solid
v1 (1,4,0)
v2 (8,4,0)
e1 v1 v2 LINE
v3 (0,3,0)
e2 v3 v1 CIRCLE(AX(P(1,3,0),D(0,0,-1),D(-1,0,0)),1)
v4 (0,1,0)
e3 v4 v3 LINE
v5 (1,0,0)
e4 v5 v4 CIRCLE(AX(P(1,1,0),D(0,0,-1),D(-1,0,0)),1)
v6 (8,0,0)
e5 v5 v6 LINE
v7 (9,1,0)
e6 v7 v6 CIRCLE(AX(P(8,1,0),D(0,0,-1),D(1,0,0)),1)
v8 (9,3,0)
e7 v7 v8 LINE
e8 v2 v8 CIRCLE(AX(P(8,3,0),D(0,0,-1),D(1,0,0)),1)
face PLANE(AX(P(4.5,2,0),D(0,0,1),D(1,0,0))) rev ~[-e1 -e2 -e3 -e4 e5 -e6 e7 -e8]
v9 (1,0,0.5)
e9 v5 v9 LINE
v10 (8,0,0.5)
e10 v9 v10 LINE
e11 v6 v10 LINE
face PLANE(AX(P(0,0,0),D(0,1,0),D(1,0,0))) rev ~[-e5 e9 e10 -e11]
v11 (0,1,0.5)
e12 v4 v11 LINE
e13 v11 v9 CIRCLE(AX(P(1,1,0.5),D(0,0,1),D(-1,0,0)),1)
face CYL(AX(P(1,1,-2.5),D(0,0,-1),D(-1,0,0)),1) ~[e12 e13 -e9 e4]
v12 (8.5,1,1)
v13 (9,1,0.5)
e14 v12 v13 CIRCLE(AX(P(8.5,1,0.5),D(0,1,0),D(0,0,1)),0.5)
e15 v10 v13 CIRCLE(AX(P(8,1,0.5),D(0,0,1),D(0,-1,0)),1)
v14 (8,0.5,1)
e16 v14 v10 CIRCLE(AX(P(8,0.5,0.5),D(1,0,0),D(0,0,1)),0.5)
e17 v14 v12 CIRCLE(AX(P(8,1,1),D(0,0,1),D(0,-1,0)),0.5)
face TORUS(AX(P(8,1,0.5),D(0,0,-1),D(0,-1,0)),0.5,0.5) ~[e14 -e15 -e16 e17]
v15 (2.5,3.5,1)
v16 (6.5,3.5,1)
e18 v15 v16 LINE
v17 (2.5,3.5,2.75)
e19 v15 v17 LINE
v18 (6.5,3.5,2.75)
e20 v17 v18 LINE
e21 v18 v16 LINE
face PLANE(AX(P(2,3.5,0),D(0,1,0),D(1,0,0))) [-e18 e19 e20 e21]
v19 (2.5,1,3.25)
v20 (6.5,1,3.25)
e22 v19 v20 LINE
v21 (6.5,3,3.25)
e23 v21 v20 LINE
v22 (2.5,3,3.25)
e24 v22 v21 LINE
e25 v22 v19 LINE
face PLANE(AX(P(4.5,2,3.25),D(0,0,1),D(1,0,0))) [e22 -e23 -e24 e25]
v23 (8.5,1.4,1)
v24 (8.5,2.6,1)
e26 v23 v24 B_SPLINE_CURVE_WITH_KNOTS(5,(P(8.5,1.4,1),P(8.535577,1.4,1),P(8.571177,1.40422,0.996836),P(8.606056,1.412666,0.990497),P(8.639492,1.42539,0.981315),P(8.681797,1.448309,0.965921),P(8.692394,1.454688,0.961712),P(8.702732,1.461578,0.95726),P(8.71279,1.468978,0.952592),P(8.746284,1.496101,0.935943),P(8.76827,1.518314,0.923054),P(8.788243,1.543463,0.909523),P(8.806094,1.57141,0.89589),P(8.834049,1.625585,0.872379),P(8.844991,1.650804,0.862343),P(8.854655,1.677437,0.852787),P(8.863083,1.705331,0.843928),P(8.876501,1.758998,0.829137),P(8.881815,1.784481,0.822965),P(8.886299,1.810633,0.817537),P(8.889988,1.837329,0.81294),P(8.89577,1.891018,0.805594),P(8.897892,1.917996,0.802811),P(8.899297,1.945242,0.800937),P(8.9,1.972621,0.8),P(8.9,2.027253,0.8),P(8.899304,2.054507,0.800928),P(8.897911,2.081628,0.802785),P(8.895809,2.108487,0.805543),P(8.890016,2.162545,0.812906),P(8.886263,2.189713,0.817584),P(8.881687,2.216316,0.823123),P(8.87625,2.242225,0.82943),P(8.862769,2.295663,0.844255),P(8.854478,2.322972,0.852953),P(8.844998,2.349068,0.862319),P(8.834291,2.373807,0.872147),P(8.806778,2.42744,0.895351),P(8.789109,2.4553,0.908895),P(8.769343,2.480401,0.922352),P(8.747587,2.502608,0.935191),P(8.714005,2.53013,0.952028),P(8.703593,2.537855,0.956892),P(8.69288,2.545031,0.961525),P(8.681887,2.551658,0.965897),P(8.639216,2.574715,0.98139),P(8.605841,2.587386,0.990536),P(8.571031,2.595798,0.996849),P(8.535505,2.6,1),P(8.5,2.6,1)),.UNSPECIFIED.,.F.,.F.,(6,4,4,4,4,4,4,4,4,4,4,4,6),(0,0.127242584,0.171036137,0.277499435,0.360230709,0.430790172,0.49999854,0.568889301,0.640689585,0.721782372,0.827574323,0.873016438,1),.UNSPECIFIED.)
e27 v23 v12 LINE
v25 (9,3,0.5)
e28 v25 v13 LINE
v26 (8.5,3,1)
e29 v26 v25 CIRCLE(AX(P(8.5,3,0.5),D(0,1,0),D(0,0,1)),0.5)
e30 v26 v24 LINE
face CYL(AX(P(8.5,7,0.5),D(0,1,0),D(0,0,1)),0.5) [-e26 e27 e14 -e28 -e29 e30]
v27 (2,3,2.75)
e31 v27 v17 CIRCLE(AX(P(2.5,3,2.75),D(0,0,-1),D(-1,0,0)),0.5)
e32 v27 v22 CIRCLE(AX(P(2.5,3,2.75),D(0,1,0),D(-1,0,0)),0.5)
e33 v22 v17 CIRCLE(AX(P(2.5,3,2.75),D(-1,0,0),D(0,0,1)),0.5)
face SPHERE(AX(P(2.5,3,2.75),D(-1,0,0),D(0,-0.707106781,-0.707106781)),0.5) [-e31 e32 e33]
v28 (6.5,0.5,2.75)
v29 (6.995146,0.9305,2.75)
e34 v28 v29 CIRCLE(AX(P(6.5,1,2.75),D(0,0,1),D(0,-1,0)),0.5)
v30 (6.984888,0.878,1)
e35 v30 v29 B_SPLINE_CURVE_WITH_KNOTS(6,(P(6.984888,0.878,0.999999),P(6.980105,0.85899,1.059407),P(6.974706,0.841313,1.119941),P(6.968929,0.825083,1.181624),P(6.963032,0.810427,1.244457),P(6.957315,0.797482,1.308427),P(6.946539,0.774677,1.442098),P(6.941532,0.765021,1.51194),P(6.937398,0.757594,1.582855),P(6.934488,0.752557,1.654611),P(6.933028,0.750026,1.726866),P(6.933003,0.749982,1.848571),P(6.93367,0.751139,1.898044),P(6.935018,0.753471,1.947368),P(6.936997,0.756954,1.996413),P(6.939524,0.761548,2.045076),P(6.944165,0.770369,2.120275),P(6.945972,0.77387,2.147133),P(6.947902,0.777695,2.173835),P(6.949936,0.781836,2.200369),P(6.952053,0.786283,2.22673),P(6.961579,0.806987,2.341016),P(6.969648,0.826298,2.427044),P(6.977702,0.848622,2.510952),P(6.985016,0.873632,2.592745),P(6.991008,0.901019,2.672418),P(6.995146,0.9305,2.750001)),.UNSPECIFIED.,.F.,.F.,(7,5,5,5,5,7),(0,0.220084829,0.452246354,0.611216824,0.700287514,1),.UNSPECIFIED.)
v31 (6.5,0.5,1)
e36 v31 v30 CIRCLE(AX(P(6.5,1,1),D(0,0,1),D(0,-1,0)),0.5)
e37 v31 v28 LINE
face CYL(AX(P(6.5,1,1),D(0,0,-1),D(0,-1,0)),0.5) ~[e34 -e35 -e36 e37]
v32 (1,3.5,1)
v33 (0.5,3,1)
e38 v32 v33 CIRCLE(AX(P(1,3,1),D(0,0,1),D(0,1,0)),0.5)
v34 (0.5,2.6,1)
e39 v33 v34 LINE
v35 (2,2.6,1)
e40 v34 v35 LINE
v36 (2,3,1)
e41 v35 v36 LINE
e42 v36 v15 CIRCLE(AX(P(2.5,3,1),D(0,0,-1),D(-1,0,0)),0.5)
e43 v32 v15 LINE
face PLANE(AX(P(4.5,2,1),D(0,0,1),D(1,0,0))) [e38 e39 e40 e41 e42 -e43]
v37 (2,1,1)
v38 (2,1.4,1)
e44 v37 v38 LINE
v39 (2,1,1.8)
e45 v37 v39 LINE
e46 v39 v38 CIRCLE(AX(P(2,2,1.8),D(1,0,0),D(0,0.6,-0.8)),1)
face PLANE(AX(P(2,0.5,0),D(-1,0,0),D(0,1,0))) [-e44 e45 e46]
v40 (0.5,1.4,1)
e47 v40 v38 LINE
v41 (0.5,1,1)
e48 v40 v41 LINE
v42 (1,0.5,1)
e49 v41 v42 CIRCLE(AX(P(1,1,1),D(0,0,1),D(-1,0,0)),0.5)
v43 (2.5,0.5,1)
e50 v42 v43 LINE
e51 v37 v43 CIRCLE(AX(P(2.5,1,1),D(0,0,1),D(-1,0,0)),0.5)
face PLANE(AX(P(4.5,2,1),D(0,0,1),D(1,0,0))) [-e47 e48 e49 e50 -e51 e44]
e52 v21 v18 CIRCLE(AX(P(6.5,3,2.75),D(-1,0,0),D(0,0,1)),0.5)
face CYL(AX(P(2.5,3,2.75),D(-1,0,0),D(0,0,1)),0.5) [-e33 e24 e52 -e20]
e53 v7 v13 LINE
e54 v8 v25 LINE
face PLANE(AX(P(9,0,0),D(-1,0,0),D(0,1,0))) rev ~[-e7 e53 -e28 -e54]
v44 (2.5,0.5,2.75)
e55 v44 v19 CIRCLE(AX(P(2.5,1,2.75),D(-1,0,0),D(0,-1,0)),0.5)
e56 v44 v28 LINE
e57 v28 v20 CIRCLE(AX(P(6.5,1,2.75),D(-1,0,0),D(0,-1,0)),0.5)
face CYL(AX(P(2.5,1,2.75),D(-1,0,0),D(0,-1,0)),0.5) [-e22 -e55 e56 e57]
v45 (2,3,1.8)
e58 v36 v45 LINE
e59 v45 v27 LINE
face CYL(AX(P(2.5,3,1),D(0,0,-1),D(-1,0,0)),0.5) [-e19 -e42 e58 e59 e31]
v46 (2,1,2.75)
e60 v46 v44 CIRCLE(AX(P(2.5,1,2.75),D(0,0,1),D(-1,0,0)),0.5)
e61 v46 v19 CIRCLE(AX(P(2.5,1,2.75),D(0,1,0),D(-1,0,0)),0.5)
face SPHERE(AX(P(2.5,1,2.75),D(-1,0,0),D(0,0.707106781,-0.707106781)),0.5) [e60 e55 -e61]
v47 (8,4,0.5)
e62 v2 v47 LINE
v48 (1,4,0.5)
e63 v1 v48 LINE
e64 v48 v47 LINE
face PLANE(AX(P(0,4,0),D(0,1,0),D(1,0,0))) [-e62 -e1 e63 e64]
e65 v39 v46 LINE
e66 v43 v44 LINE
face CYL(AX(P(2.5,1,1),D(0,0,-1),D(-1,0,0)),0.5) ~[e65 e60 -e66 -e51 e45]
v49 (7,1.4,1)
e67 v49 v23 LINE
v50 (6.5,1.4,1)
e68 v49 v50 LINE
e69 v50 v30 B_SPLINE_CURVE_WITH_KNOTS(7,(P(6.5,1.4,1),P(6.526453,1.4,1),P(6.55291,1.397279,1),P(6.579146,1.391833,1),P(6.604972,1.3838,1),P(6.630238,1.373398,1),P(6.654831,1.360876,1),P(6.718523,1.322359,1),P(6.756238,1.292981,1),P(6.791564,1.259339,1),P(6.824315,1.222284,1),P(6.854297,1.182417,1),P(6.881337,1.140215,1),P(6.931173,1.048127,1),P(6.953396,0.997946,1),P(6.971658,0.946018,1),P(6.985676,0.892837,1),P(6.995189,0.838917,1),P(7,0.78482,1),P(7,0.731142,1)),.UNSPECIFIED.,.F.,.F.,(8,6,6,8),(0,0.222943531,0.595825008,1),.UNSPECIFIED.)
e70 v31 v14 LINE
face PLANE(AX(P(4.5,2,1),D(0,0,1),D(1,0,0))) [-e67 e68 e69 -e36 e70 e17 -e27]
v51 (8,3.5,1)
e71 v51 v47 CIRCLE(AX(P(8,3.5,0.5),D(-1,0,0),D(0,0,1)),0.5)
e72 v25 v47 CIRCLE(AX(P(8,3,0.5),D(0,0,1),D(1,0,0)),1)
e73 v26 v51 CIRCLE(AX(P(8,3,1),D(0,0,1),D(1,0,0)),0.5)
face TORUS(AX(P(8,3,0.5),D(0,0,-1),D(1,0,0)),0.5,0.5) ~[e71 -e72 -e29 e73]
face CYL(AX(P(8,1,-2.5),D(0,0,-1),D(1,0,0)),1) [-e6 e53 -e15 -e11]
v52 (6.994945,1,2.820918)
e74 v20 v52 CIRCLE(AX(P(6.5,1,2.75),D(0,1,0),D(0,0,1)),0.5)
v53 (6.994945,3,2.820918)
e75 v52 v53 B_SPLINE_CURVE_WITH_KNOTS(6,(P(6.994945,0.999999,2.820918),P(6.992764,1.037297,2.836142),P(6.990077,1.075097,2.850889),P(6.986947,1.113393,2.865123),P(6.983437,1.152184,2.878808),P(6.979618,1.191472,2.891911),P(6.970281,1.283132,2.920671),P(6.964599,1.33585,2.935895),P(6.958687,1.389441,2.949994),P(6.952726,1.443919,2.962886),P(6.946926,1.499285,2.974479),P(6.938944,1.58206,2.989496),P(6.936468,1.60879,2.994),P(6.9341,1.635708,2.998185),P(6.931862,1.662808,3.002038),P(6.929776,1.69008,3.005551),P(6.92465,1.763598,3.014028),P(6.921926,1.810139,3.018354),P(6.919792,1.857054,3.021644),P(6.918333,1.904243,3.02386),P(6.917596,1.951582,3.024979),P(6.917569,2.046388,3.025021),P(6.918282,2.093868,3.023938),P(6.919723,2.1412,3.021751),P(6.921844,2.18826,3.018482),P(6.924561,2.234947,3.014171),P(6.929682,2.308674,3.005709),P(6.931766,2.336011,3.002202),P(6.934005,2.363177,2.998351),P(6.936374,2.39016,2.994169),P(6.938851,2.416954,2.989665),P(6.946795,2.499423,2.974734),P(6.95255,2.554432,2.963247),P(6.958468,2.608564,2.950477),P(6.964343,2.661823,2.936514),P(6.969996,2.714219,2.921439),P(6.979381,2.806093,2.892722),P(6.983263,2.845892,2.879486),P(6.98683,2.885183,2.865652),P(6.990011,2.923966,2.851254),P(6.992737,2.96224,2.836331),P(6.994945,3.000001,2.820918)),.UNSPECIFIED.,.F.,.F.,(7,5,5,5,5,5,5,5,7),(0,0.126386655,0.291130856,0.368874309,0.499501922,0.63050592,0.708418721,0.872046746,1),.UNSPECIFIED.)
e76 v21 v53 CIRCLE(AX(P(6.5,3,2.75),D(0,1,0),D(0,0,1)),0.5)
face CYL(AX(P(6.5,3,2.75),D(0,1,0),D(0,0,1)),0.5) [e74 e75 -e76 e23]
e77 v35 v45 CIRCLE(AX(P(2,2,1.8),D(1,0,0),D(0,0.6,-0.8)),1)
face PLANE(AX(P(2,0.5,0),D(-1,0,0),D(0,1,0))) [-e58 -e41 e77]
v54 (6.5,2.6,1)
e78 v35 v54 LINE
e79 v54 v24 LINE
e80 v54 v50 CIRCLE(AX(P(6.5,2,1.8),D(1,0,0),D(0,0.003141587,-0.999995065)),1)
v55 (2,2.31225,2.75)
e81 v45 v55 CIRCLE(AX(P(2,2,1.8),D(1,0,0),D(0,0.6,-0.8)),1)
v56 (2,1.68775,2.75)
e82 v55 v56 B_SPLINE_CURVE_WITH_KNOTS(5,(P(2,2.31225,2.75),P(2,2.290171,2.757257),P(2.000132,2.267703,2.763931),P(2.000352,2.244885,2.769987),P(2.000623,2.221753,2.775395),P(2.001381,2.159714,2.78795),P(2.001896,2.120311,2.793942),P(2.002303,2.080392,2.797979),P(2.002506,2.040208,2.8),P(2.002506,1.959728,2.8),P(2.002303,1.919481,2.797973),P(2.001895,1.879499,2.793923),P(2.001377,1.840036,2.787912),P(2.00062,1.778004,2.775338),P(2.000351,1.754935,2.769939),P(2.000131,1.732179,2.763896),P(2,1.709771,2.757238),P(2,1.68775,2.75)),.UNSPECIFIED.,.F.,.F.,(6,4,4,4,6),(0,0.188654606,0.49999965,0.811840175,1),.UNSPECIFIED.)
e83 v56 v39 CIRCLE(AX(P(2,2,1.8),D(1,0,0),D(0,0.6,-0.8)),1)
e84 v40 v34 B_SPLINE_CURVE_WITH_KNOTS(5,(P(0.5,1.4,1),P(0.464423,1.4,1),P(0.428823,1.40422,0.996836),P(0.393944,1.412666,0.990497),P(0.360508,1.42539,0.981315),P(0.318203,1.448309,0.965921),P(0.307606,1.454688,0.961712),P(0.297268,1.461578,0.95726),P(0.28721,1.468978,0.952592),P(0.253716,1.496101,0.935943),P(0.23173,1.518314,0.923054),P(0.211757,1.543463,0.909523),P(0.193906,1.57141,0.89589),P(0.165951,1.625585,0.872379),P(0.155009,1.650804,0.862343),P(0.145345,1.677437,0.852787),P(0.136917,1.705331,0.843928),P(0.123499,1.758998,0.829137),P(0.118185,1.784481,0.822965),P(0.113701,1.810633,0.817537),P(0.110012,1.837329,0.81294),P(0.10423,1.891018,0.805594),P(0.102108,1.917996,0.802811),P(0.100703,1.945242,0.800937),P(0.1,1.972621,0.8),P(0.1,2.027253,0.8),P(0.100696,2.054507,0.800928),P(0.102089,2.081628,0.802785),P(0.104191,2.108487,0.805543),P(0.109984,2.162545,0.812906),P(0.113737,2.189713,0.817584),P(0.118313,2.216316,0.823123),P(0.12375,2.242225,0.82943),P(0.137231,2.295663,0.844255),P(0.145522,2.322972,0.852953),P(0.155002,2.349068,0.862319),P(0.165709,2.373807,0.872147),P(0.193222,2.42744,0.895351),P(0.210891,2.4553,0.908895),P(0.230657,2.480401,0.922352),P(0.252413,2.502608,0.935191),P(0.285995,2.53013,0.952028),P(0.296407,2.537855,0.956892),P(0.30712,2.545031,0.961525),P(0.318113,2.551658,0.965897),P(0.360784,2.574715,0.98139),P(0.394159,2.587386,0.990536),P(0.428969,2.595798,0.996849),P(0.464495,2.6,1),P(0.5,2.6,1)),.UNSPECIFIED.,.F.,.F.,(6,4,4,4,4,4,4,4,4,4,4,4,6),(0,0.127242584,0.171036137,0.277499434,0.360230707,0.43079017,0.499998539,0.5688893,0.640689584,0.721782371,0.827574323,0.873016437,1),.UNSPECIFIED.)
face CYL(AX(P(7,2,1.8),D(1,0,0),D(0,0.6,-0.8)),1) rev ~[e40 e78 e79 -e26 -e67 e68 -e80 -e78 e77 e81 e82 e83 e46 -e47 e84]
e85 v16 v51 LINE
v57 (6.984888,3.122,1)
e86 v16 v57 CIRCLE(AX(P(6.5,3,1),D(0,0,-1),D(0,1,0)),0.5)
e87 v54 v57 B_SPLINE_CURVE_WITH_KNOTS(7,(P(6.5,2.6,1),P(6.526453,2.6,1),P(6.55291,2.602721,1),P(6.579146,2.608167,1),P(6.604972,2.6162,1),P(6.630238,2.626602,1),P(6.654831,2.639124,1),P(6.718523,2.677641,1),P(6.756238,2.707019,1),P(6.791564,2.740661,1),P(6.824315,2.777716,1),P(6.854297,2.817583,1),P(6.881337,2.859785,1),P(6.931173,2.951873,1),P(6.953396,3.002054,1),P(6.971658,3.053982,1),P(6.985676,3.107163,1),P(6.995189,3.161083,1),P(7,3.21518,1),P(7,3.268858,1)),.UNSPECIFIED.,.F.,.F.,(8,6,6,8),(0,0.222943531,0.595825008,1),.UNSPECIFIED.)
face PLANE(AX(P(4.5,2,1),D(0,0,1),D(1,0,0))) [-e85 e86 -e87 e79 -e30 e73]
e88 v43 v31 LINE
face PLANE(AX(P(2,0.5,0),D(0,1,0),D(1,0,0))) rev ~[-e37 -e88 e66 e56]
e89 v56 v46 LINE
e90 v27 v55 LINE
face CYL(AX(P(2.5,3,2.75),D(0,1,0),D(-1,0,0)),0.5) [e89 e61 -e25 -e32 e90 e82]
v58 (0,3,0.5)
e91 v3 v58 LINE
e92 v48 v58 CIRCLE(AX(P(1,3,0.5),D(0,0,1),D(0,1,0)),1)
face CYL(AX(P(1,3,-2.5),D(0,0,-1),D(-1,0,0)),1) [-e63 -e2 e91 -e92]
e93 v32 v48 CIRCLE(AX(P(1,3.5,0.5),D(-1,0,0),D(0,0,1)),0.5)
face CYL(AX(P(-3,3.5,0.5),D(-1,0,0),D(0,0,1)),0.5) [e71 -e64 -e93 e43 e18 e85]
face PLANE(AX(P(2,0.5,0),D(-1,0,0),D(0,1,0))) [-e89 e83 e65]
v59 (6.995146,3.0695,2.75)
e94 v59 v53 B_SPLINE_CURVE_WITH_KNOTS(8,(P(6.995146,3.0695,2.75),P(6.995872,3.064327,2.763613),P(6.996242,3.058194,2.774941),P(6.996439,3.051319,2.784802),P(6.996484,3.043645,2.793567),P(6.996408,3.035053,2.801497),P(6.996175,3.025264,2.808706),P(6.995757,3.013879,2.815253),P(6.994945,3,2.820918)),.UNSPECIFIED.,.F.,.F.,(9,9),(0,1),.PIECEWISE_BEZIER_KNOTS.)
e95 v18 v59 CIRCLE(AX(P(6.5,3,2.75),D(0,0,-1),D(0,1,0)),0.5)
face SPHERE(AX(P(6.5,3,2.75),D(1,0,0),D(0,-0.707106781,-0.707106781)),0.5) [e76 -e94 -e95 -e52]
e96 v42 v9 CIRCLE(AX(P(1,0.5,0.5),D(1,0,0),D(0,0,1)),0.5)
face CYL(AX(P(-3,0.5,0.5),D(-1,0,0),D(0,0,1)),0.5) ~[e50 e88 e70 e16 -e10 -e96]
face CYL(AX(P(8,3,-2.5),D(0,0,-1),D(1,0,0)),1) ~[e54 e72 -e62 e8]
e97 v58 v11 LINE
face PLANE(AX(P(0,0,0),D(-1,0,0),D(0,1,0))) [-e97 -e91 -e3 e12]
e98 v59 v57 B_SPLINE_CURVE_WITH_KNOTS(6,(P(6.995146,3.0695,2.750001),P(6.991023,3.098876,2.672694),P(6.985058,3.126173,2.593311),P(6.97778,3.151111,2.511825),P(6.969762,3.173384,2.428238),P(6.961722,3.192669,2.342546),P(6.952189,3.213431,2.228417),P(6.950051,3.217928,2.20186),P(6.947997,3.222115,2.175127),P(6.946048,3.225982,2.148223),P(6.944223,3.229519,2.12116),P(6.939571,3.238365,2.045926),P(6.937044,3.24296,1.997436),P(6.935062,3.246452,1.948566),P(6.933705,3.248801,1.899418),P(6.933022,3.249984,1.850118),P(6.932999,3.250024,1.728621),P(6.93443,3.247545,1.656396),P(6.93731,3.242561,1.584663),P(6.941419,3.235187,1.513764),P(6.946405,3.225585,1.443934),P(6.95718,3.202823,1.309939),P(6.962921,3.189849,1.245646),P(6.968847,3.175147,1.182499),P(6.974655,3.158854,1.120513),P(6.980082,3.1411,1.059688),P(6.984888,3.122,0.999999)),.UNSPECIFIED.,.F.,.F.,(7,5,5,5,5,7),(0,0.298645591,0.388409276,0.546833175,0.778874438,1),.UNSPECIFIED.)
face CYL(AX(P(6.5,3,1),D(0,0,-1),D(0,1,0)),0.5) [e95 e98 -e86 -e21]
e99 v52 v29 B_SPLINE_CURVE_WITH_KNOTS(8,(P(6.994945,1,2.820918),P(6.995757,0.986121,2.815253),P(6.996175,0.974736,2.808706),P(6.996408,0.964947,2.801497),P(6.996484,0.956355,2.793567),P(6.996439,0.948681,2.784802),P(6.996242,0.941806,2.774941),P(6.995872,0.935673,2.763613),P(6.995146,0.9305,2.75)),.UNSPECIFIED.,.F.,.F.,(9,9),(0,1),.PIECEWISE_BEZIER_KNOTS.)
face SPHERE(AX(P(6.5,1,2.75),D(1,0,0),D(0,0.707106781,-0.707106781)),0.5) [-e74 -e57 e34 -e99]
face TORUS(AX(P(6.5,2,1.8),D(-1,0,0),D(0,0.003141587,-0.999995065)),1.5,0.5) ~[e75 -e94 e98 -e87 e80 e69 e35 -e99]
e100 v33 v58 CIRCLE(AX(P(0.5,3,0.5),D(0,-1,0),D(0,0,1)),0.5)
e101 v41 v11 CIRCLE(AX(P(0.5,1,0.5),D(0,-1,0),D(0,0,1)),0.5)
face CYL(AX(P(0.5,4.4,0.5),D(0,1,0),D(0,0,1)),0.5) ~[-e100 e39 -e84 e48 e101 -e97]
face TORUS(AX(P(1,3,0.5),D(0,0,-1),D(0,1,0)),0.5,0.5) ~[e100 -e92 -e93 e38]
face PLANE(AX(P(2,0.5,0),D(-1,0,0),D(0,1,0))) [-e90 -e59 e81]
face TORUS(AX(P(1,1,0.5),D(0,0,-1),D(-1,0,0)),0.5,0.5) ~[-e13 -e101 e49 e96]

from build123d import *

# Parameters (mm, degrees)
F0_W         = 5
F0_H         = 3
F1_DEPTH     = 3.25
F0_W_2       = 9
F0_H_2       = 4
F2_DEPTH     = 1
F5_DEPTH     = 12.5
F6_T1_DEPTH  = 4
F6_T3_DEPTH  = 2
F6_T5_DEPTH  = 1.75
F6_S9_W      = 0.5
F6_S9_H      = 0.5
F6_T10_DEPTH = 0.5
F6_S15_W     = 0.5
F6_S15_H     = 0.5
F6_T16_DEPTH = 0.5
F6_S21_W     = 0.5
F6_S21_H     = 0.5
F6_T22_DEPTH = 0.5
F6_S27_W     = 0.5
F6_S27_H     = 0.5
F6_T28_DEPTH = 0.5
F6_T34_ANGLE = 359.64
F7_T1_DEPTH  = 15
F7_T3_DEPTH  = 7.4
F7_T5_DEPTH  = 7.4
F8_T1_DEPTH  = 3.5
F8_T4_ANGLE  = 90
F8_T6_ANGLE  = 90
F8_T8_ANGLE  = 90
F8_T10_ANGLE = 90


# Not quite as in the source:
# - a fillet or chamfer that OpenCascade refuses, or shapes differently, is made with other operations: its cross-section is extruded or revolved along the edge and cut away or added
# - a feature names something its author has since deleted; it is built from what else it names


with BuildPart() as f1:
    # F0 (on Top) → F1 (new body)
    with BuildSketch(Plane.XY):
        with Locations((4.5, 2)):
            Rectangle(F0_W, F0_H)
    extrude(amount=F1_DEPTH)

    # F0 (on Top) → F2 (join)
    with BuildSketch(Plane.XY):
        with Locations((4.5, 2)):
            Rectangle(F0_W_2, F0_H_2)
        with Locations((4.5, 2)):
            Rectangle(F0_W, F0_H, mode=Mode.SUBTRACT)
    extrude(amount=F2_DEPTH)

    # F4 (on face) → F5 (cut, symmetric)
    with BuildSketch(Plane.YZ.offset(7)):
        with BuildLine():
            Line((2.6, 1), (1.4, 1))
            ThreePointArc((1.4, 1), (2, 0.8), (2.6, 1))
        make_face()
        with BuildLine():
            ThreePointArc((2.6, 1), (2.894427191, 1.3527864045), (3, 1.8))
            ThreePointArc((3, 1.8), (1.5527864045, 2.694427191), (1.4, 1))
            Line((1.4, 1), (2.6, 1))
        make_face()
    extrude(amount=F5_DEPTH, both=True, mode=Mode.SUBTRACT)

    # F6: fillet of radius 0.5 on 9 edges, made by hand

    # F6_s2 → F6_t1 (cut)
    with BuildSketch(Plane.YZ.offset(2.5)):
        with BuildLine():
            ThreePointArc((0.5, 2.75), (0.6464466094, 3.1035533906), (1, 3.25))
            Line((1, 3.25), (0.5, 3.25))
            Line((0.5, 3.25), (0.5, 2.75))
        make_face()
        with BuildLine():
            ThreePointArc((3, 3.25), (3.3535533906, 3.1035533906), (3.5, 2.75))
            Line((3.5, 2.75), (3.5, 3.25))
            Line((3.5, 3.25), (3, 3.25))
        make_face()
    extrude(amount=F6_T1_DEPTH, mode=Mode.SUBTRACT)

    # F6_s4 → F6_t3 (cut)
    with BuildSketch(Plane.XZ.offset(-3)):
        with BuildLine():
            ThreePointArc((6.5, 3.25), (6.8535533906, 3.1035533906), (7, 2.75))
            Line((7, 2.75), (7, 3.25))
            Line((7, 3.25), (6.5, 3.25))
        make_face()
        with BuildLine():
            ThreePointArc((2, 2.75), (2.1464466094, 3.1035533906), (2.5, 3.25))
            Line((2.5, 3.25), (2, 3.25))
            Line((2, 3.25), (2, 2.75))
        make_face()
    extrude(amount=F6_T3_DEPTH, mode=Mode.SUBTRACT)

    # F6_s6 → F6_t5 (cut)
    with BuildSketch(Plane.XY.offset(1)):
        with BuildLine():
            ThreePointArc((6.5, 0.5), (6.8535533906, 0.6464466094), (7, 1))
            Line((7, 1), (7, 0.5))
            Line((7, 0.5), (6.5, 0.5))
        make_face()
        with BuildLine():
            ThreePointArc((6.5, 3.5), (6.8535533906, 3.3535533906), (7, 3))
            Line((7, 3), (7, 3.5))
            Line((7, 3.5), (6.5, 3.5))
        make_face()
        with BuildLine():
            ThreePointArc((2, 1), (2.1464466094, 0.6464466094), (2.5, 0.5))
            Line((2.5, 0.5), (2, 0.5))
            Line((2, 0.5), (2, 1))
        make_face()
        with BuildLine():
            ThreePointArc((2, 3), (2.1464466094, 3.3535533906), (2.5, 3.5))
            Line((2.5, 3.5), (2, 3.5))
            Line((2, 3.5), (2, 3))
        make_face()
    extrude(amount=F6_T5_DEPTH, mode=Mode.SUBTRACT)


with BuildPart() as f6_tool8:
    # F6_s9 → F6_t10 (new body)
    with BuildSketch(Plane.YZ.offset(2.5)):
        with Locations((0.75, 3)):
            Rectangle(F6_S9_W, F6_S9_H)
    extrude(amount=-F6_T10_DEPTH)

    # F6_s11 → F6_t12 (revolve, cut)
    with BuildSketch(Plane(origin=(2.5, 1, 2.75), x_dir=(0, 0.7071067812, -0.7071067812), z_dir=(0, 0.7071067812, 0.7071067812))):
        with BuildLine():
            ThreePointArc((0, -0.5), (0.5, 0), (0, 0.5))
            Line((0, 0.5), (0, -0.5))
        make_face()
    revolve(axis=Axis((2.5, 1, 2.75), (-1, 0, 0)), mode=Mode.SUBTRACT)


with BuildPart() as f1_1:
    add(f1.part)

    # F6_t7: cut F6_tool8
    add(f6_tool8.part, mode=Mode.SUBTRACT)


with BuildPart() as f6_tool14:
    # F6_s15 → F6_t16 (new body)
    with BuildSketch(Plane.YZ.offset(6.5)):
        with Locations((0.75, 3)):
            Rectangle(F6_S15_W, F6_S15_H)
    extrude(amount=F6_T16_DEPTH)

    # F6_s17 → F6_t18 (revolve, cut)
    with BuildSketch(Plane(origin=(6.5, 1, 2.75), x_dir=(0, 0.7071067812, -0.7071067812), z_dir=(0, -0.7071067812, -0.7071067812))):
        with BuildLine():
            ThreePointArc((0, -0.5), (0.5, 0), (0, 0.5))
            Line((0, 0.5), (0, -0.5))
        make_face()
    revolve(axis=Axis((6.5, 1, 2.75), (1, 0, 0)), mode=Mode.SUBTRACT)


with BuildPart() as f1_2:
    add(f1_1.part)

    # F6_t13: cut F6_tool14
    add(f6_tool14.part, mode=Mode.SUBTRACT)


with BuildPart() as f6_tool20:
    # F6_s21 → F6_t22 (new body)
    with BuildSketch(Plane.YZ.offset(6.5)):
        with Locations((3.25, 3)):
            Rectangle(F6_S21_W, F6_S21_H)
    extrude(amount=F6_T22_DEPTH)

    # F6_s23 → F6_t24 (revolve, cut)
    with BuildSketch(Plane(origin=(6.5, 3, 2.75), x_dir=(0, -0.7071067812, -0.7071067812), z_dir=(0, -0.7071067812, 0.7071067812))):
        with BuildLine():
            ThreePointArc((0, -0.5), (0.5, 0), (0, 0.5))
            Line((0, 0.5), (0, -0.5))
        make_face()
    revolve(axis=Axis((6.5, 3, 2.75), (1, 0, 0)), mode=Mode.SUBTRACT)


with BuildPart() as f1_3:
    add(f1_2.part)

    # F6_t19: cut F6_tool20
    add(f6_tool20.part, mode=Mode.SUBTRACT)


with BuildPart() as f6_tool26:
    # F6_s27 → F6_t28 (new body)
    with BuildSketch(Plane.YZ.offset(2.5)):
        with Locations((3.25, 3)):
            Rectangle(F6_S27_W, F6_S27_H)
    extrude(amount=-F6_T28_DEPTH)

    # F6_s29 → F6_t30 (revolve, cut)
    with BuildSketch(Plane(origin=(2.5, 3, 2.75), x_dir=(0, -0.7071067812, -0.7071067812), z_dir=(0, 0.7071067812, -0.7071067812))):
        with BuildLine():
            ThreePointArc((0, -0.5), (0.5, 0), (0, 0.5))
            Line((0, 0.5), (0, -0.5))
        make_face()
    revolve(axis=Axis((2.5, 3, 2.75), (-1, 0, 0)), mode=Mode.SUBTRACT)


with BuildPart() as f1_4:
    add(f1_3.part)

    # F6_t25: cut F6_tool26
    add(f6_tool26.part, mode=Mode.SUBTRACT)


with BuildPart() as f6_tool32:
    # F6_s33 → F6_t34 (revolve)
    with BuildSketch(Plane(origin=(0, 2.0056350904, 0.0063009092), x_dir=(1, 0, 0), z_dir=(0, -0.9999950652, -0.0031415875))):
        with BuildLine():
            ThreePointArc((6.5, 0.7937079424), (6.8535533906, 0.647261333), (7, 0.2937079424))
            Line((7, 0.2937079424), (7, 0.7937079424))
            Line((7, 0.7937079424), (6.5, 0.7937079424))
        make_face()
    revolve(axis=Axis((7, 2, 1.8), (1, 0, 0)), revolution_arc=F6_T34_ANGLE)

    split(bisect_by=Plane.XY.offset(1), keep=Keep.TOP)


with BuildPart() as f1_5:
    add(f1_4.part)

    # F6_t31: cut F6_tool32
    add(f6_tool32.part, mode=Mode.SUBTRACT)

    # F7: fillet of radius 0.5 on 4 edges, made by hand

    # F7_s2 → F7_t1 (cut)
    with BuildSketch(Plane.YZ.offset(-3)):
        with BuildLine():
            ThreePointArc((3.5, 1), (3.8535533906, 0.8535533906), (4, 0.5))
            Line((4, 0.5), (4.01, 0.5))
            Line((4.01, 0.5), (4.01, 1.01))
            Line((4.01, 1.01), (3.5, 1.01))
            Line((3.5, 1.01), (3.5, 1))
        make_face()
        with BuildLine():
            ThreePointArc((0.5, 1), (0.1464466094, 0.8535533906), (0, 0.5))
            Line((0, 0.5), (-0.01, 0.5))
            Line((-0.01, 0.5), (-0.01, 1.01))
            Line((-0.01, 1.01), (0.5, 1.01))
            Line((0.5, 1.01), (0.5, 1))
        make_face()
    extrude(amount=F7_T1_DEPTH, mode=Mode.SUBTRACT)

    # F7_s4 → F7_t3 (cut)
    with BuildSketch(Plane.XZ.offset(-4.4)):
        with BuildLine():
            ThreePointArc((0.5, 1), (0.1464466094, 0.8535533906), (0, 0.5))
            Line((0, 0.5), (-0.01, 0.5))
            Line((-0.01, 0.5), (-0.01, 1.01))
            Line((-0.01, 1.01), (0.5, 1.01))
            Line((0.5, 1.01), (0.5, 1))
        make_face()
    extrude(amount=F7_T3_DEPTH, mode=Mode.SUBTRACT)

    # F7_s6 → F7_t5 (cut)
    with BuildSketch(Plane.XZ.offset(-7)):
        with BuildLine():
            ThreePointArc((8.5, 1), (8.8535533906, 0.8535533906), (9, 0.5))
            Line((9, 0.5), (9.01, 0.5))
            Line((9.01, 0.5), (9.01, 1.01))
            Line((9.01, 1.01), (8.5, 1.01))
            Line((8.5, 1.01), (8.5, 1))
        make_face()
    extrude(amount=F7_T5_DEPTH, mode=Mode.SUBTRACT)

    # F8: fillet of radius 1 on 4 edges, made by hand

    # F8_s2 → F8_t1 (cut)
    with BuildSketch(Plane.XY.offset(-2.5)):
        with BuildLine():
            ThreePointArc((9, 1), (8.7071067812, 0.2928932188), (8, 0))
            Line((8, 0), (9, 0))
            Line((9, 0), (9, 1))
        make_face()
        with BuildLine():
            ThreePointArc((9, 3), (8.7071067812, 3.7071067812), (8, 4))
            Line((8, 4), (9, 4))
            Line((9, 4), (9, 3))
        make_face()
        with BuildLine():
            ThreePointArc((0, 1), (0.2928932188, 0.2928932188), (1, 0))
            Line((1, 0), (0, 0))
            Line((0, 0), (0, 1))
        make_face()
        with BuildLine():
            ThreePointArc((0, 3), (0.2928932188, 3.7071067812), (1, 4))
            Line((1, 4), (0, 4))
            Line((0, 4), (0, 3))
        make_face()
    extrude(amount=F8_T1_DEPTH, mode=Mode.SUBTRACT)

    # F8_s3 → F8_t4 (revolve, cut)
    with BuildSketch(Plane.YZ.offset(1)):
        with BuildLine():
            ThreePointArc((3.5, 1), (3.8535533906, 0.8535533906), (4, 0.5))
            Line((4, 0.5), (4, 1))
            Line((4, 1), (3.5, 1))
        make_face()
    revolve(axis=Axis((1, 3, 1), (0, 0, 1)), revolution_arc=F8_T4_ANGLE, mode=Mode.SUBTRACT)

    # F8_s5 → F8_t6 (revolve, cut)
    with BuildSketch(Plane.XZ.offset(-1)):
        with BuildLine():
            ThreePointArc((0.5, 1), (0.1464466094, 0.8535533906), (0, 0.5))
            Line((0, 0.5), (0, 1))
            Line((0, 1), (0.5, 1))
        make_face()
    revolve(axis=Axis((1, 1, 1), (0, 0, 1)), revolution_arc=F8_T6_ANGLE, mode=Mode.SUBTRACT)

    # F8_s7 → F8_t8 (revolve, cut)
    with BuildSketch(Plane.XZ.offset(-3)):
        with BuildLine():
            ThreePointArc((8.5, 1), (8.8535533906, 0.8535533906), (9, 0.5))
            Line((9, 0.5), (9, 1))
            Line((9, 1), (8.5, 1))
        make_face()
    revolve(axis=Axis((8, 3, 1), (0, 0, 1)), revolution_arc=F8_T8_ANGLE, mode=Mode.SUBTRACT)

    # F8_s9 → F8_t10 (revolve, cut)
    with BuildSketch(Plane.YZ.offset(8)):
        with BuildLine():
            ThreePointArc((0.5, 1), (0.1464466094, 0.8535533906), (0, 0.5))
            Line((0, 0.5), (0, 1))
            Line((0, 1), (0.5, 1))
        make_face()
    revolve(axis=Axis((8, 1, 1), (0, 0, 1)), revolution_arc=F8_T10_ANGLE, mode=Mode.SUBTRACT)


solid = f1_5.part
